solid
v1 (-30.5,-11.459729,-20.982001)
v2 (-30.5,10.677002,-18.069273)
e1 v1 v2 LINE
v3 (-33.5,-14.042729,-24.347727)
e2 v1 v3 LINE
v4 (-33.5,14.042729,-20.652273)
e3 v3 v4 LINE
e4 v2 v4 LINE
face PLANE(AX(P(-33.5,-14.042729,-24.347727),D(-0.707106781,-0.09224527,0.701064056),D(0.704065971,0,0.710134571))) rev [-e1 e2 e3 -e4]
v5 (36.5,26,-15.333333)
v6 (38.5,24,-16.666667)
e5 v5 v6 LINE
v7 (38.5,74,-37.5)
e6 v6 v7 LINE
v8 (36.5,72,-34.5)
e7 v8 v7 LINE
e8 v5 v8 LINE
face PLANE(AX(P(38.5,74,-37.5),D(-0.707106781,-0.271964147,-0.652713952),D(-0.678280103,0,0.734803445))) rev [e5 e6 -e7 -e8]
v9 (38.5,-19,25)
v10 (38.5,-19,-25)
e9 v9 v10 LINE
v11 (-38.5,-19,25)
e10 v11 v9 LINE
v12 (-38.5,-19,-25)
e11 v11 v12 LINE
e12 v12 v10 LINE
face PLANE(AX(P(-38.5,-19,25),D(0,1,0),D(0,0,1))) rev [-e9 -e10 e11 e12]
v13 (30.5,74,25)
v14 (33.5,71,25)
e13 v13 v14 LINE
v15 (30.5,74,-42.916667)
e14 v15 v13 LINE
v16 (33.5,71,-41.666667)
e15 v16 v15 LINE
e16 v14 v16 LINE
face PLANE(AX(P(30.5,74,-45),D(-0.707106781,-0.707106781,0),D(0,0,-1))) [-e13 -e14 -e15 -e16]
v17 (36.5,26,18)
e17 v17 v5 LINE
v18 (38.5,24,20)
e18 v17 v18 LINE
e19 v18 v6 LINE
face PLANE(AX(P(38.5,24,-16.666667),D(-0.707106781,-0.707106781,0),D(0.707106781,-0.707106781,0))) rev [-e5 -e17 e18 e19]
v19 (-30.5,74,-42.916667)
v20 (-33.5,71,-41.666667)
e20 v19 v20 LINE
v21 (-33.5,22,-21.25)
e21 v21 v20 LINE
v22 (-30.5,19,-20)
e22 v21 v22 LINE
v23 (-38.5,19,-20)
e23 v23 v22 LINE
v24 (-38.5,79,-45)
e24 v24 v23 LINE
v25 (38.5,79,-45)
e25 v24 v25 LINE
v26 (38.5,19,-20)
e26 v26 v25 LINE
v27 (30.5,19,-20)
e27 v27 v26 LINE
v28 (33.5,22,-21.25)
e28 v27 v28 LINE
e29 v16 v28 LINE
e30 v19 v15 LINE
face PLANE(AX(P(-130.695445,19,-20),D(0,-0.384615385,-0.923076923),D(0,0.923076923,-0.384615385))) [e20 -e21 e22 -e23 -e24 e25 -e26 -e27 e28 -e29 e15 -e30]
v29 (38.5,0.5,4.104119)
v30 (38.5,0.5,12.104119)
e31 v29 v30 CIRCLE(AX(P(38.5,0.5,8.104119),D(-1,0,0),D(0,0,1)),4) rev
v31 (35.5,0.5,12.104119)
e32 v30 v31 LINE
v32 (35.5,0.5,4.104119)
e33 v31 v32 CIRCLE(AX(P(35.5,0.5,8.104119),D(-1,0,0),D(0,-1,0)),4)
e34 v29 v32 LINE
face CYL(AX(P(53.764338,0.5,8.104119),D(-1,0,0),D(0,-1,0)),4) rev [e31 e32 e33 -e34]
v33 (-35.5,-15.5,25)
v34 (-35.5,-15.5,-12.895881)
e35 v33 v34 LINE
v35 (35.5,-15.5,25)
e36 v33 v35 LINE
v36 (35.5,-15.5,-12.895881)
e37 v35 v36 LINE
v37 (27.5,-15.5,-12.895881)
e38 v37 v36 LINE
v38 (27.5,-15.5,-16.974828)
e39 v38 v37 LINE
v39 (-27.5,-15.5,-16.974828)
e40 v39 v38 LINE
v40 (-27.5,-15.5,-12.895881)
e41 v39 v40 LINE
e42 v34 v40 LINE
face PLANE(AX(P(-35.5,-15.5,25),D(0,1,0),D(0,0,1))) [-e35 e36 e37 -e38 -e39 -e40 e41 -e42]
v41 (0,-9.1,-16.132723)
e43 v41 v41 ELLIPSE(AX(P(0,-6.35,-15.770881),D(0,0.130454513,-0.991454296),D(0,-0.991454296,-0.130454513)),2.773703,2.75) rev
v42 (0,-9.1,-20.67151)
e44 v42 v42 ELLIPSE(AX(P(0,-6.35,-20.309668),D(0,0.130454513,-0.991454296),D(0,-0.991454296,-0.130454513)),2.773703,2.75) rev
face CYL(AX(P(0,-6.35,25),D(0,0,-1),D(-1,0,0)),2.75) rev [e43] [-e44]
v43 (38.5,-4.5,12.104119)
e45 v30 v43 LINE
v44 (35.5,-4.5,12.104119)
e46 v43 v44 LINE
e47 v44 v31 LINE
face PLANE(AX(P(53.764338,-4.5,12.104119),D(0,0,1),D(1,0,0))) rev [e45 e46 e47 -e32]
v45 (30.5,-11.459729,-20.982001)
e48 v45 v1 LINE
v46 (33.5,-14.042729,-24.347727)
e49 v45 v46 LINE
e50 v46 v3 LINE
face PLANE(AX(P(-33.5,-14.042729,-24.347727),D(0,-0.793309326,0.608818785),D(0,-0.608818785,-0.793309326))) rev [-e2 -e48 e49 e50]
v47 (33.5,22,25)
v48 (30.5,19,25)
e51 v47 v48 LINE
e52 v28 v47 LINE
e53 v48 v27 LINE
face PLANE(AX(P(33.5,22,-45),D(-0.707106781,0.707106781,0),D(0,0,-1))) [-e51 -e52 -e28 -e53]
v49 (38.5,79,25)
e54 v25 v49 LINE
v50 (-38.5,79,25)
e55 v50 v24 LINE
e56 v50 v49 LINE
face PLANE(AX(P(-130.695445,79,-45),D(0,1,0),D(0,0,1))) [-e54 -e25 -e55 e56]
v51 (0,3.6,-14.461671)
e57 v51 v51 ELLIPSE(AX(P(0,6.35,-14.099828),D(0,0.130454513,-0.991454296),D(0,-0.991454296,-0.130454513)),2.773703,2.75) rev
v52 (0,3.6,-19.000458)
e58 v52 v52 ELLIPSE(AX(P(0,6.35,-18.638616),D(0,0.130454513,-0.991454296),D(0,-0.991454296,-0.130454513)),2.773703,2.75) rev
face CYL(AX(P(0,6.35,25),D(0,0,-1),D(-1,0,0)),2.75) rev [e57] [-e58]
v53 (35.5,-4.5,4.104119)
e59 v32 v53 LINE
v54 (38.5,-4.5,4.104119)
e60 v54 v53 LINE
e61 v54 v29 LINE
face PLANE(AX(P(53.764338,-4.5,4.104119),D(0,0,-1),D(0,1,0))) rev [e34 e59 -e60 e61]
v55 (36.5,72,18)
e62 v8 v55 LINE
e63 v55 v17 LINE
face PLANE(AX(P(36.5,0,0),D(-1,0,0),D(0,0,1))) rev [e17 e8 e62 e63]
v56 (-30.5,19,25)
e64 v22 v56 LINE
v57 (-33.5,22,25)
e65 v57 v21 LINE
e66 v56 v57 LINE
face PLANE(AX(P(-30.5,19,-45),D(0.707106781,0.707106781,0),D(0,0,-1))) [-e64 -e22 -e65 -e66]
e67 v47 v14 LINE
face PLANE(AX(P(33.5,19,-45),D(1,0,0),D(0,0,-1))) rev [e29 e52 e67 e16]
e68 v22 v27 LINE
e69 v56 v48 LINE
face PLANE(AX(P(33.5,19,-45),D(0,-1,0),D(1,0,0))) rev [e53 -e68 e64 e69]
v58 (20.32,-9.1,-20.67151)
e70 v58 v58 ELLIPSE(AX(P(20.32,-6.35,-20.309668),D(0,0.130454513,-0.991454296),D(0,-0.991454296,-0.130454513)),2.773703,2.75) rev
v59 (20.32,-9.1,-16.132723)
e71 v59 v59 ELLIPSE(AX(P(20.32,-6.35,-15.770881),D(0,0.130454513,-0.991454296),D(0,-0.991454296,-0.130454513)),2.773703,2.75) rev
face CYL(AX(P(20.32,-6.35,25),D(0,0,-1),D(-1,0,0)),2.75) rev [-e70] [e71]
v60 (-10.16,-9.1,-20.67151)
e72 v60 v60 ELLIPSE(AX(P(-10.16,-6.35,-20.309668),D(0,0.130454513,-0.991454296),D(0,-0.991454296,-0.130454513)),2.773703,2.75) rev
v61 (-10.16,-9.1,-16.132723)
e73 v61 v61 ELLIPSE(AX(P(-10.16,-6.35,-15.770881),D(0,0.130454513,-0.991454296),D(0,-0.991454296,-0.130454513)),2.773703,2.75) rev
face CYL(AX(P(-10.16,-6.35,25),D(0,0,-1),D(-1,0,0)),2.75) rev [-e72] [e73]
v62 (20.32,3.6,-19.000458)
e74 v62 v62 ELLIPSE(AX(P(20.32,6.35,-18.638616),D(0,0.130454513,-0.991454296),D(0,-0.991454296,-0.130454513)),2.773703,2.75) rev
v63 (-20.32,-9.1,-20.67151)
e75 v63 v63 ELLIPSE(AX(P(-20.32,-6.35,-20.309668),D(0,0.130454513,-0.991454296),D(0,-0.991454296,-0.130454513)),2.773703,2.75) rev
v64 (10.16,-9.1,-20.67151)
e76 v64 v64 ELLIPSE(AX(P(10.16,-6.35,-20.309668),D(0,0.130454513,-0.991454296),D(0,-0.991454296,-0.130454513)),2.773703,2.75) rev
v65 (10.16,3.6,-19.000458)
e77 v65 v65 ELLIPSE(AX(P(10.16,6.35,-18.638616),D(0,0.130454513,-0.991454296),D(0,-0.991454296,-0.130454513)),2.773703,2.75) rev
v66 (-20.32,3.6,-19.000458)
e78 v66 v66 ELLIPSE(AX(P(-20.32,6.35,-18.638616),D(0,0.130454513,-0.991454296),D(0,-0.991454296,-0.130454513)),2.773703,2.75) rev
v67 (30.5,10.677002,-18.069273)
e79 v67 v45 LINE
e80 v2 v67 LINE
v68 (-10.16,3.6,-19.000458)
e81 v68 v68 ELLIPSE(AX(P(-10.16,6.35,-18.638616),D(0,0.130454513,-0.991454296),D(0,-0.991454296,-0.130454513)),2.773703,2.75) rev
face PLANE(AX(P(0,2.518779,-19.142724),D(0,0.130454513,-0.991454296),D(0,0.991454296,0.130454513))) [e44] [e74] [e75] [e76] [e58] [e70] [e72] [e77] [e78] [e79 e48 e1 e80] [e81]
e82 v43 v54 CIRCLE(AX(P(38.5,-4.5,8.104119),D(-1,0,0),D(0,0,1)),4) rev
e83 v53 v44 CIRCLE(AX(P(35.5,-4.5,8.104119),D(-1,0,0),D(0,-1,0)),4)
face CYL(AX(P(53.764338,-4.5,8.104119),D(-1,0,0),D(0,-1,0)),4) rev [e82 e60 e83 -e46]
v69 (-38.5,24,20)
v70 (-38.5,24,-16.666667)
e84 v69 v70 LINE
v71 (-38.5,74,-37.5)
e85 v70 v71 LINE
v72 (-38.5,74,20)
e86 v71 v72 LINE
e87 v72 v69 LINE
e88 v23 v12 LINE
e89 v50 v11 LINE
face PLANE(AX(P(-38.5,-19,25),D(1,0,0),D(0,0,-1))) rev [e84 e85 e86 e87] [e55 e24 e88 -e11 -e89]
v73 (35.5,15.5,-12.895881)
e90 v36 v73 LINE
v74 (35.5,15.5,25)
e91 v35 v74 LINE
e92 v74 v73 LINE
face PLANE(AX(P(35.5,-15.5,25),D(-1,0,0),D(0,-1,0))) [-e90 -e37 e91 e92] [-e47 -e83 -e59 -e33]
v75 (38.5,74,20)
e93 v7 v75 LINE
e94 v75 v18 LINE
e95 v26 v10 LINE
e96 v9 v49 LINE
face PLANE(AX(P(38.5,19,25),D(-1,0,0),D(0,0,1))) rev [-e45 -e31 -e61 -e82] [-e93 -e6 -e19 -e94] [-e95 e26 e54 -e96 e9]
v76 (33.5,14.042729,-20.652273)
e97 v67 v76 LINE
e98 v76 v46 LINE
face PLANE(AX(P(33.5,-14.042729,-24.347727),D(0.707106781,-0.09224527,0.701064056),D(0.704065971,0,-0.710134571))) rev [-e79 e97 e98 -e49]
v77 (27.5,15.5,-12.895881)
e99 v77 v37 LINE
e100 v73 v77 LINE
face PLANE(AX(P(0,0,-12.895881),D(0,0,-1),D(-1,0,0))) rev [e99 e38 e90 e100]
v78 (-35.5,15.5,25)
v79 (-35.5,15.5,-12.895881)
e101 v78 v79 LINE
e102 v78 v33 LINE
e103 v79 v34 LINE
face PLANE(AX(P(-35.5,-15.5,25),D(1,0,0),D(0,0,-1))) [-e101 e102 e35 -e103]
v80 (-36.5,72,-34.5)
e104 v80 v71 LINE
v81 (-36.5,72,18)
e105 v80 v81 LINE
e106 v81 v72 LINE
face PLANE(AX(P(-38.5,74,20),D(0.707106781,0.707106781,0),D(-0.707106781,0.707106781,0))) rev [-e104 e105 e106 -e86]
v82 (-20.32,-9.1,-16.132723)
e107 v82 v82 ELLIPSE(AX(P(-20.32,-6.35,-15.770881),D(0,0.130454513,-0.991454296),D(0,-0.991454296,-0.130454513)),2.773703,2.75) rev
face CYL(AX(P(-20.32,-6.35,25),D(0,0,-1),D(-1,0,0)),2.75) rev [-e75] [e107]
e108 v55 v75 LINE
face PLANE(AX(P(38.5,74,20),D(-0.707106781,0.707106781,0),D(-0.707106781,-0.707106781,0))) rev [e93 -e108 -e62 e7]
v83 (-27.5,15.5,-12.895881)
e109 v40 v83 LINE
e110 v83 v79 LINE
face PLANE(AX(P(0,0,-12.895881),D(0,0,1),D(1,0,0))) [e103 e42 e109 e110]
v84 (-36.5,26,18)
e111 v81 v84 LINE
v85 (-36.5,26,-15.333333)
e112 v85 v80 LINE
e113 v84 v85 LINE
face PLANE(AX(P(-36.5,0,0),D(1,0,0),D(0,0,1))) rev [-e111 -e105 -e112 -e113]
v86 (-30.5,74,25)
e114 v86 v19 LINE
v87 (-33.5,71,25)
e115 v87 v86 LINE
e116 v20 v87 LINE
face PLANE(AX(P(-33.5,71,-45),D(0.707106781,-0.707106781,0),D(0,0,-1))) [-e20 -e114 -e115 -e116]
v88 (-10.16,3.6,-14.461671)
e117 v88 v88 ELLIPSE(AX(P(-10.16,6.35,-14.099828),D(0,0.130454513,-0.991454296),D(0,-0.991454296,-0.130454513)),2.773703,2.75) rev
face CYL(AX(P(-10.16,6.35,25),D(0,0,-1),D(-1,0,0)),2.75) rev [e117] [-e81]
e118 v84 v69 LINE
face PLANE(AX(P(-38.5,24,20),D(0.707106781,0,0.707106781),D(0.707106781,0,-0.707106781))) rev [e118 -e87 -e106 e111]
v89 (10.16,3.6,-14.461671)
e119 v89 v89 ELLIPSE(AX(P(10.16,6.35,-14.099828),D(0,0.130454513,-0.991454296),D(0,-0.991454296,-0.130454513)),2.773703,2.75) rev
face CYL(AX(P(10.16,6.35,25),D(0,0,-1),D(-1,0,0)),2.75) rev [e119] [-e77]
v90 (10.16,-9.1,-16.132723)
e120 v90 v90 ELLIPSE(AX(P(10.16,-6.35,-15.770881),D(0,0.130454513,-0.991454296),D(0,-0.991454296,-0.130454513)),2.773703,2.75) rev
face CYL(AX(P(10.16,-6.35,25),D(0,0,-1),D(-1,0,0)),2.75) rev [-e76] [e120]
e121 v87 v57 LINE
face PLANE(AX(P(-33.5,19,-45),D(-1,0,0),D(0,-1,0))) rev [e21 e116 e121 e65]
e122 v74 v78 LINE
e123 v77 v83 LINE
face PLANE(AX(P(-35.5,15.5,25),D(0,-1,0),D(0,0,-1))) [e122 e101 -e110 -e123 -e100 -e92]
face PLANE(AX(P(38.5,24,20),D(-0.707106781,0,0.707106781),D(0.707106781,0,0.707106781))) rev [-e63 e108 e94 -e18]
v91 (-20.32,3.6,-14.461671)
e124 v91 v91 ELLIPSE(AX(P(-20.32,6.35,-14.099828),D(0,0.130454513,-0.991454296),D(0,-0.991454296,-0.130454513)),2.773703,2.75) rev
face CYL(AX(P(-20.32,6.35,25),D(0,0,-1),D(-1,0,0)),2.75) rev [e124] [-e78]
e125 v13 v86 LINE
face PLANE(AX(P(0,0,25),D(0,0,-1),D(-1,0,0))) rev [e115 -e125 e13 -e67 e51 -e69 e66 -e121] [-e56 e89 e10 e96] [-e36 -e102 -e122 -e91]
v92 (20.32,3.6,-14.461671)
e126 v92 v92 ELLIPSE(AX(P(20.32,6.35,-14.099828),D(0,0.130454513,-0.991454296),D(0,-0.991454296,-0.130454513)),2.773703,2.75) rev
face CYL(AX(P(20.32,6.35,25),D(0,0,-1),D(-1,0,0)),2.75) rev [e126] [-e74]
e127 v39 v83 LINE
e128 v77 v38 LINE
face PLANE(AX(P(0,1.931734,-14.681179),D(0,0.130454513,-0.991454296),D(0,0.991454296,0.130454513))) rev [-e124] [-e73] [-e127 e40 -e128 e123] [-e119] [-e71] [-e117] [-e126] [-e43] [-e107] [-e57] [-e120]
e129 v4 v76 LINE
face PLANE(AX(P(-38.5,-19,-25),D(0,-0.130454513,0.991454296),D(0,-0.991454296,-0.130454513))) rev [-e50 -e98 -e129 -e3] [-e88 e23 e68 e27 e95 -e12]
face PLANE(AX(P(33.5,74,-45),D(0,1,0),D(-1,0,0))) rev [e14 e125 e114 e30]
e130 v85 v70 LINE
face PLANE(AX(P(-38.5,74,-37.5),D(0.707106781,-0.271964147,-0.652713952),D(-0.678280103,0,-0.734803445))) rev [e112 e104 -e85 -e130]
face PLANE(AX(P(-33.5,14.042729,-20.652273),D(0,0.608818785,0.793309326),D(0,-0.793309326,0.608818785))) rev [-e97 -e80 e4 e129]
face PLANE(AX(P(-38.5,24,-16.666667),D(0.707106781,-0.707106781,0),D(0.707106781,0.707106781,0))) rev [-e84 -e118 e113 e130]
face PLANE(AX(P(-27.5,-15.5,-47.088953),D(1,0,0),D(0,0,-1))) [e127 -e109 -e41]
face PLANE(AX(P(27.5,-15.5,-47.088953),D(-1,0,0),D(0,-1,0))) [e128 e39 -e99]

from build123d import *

# Parameters (mm, degrees)
SKIZZE1_W                                   = 77
SKIZZE1_H                                   = 38
AUFSATZ_LINEAR_AUSTRAGEN1_DEPTH             = 25
SKIZZE5_R                                   = 2.75
SCHNITT_LINEAR_AUSTRAGEN1_DEPTH             = 66.903338307
SCHNITT_LINEAR_AUSTRAGEN2_DEPTH             = 50.681485485
SCHNITT_LINEAR_AUSTRAGEN2_DEPTH_BACK        = 50.681485485
SKIZZE8_W                                   = 67
SKIZZE8_H                                   = 28.327535794
SCHNITT_LINEAR_AUSTRAGEN8_DEPTH             = 3
SCHNITT_LINEAR_AUSTRAGEN8_DRAFT             = -45
SKIZZE9_W                                   = 71
SKIZZE9_H                                   = 31
SCHNITT_LINEAR_AUSTRAGEN9_DEPTH             = 50.681485485
SCHNITT_LINEAR_AUSTRAGEN9_DIRECTION_2_REACH = 51.681
AUFSATZ_LINEAR_START                        = -16.974828462
AUFSATZ_LINEAR_AUSTRAGEN2_OUTLINE_W         = 8
AUFSATZ_LINEAR_AUSTRAGEN2_OUTLINE_H         = 31
AUFSATZ_LINEAR_AUSTRAGEN2_DEPTH             = 4.078947369
AUFSATZ_LINEAR_AUSTRAGEN4_DEPTH             = 77
SKIZZE23_W                                  = 67
SKIZZE23_H                                  = 55
SCHNITT_LINEAR_AUSTRAGEN19_DEPTH            = 113.353237604
SCHNITT_LINEAR_AUSTRAGEN20_DEPTH            = 2
SCHNITT_LINEAR_AUSTRAGEN20_DRAFT            = -45
SPIEGELN9_COPY_1_DEPTH                      = 2
SPIEGELN9_COPY_1_DRAFT                      = -45
FASE2_SIZE                                  = 3
SCHNITT_LINEAR_AUSTRAGEN21_DEPTH            = 3


# Read off the part's stored shape, not the designer's step: Aufsatz-Linear austragen2
with BuildPart() as part:
    # Skizze1 → Aufsatz-Linear austragen1 (new, symmetric)
    with BuildSketch(Plane.XY):
        Rectangle(SKIZZE1_W, SKIZZE1_H)
    extrude(amount=AUFSATZ_LINEAR_AUSTRAGEN1_DEPTH, both=True)

    # Skizze5 → Schnitt-Linear austragen1 (cut, through all)
    with BuildSketch(Plane(origin=(0, 0, -25), x_dir=(-1, 0, 0), z_dir=(0, 0, -1))):
        with Locations((-20.32, 6.35)):
            Circle(SKIZZE5_R)
        with Locations((-20.32, -6.35)):
            Circle(SKIZZE5_R)
        with Locations((-10.16, 6.35)):
            Circle(SKIZZE5_R)
        with Locations((-10.16, -6.35)):
            Circle(SKIZZE5_R)
        with Locations((0, 6.35)):
            Circle(SKIZZE5_R)
        with Locations((0, -6.35)):
            Circle(SKIZZE5_R)
        with Locations((10.16, 6.35)):
            Circle(SKIZZE5_R)
        with Locations((10.16, -6.35)):
            Circle(SKIZZE5_R)
        with Locations((20.32, 6.35)):
            Circle(SKIZZE5_R)
        with Locations((20.32, -6.35)):
            Circle(SKIZZE5_R)
    extrude(amount=-SCHNITT_LINEAR_AUSTRAGEN1_DEPTH, mode=Mode.SUBTRACT)

    # Skizze6 → Schnitt-Linear austragen2 (cut, two sides: drawn at the far end of the back side and taken through both)
    with BuildSketch(Plane(origin=(0, 0, 0), x_dir=(0, 0, -1), z_dir=(1, 0, 0)).offset(-SCHNITT_LINEAR_AUSTRAGEN2_DEPTH_BACK)):
        Polygon((20, 19), (25, 19), (25, -19), align=None)
    extrude(amount=SCHNITT_LINEAR_AUSTRAGEN2_DEPTH + SCHNITT_LINEAR_AUSTRAGEN2_DEPTH_BACK, mode=Mode.SUBTRACT)


with BuildPart() as schnitt_linear_austragen8_tool:
    # Skizze8 → Schnitt-Linear austragen8 (with draft: the straight prism first)
    with BuildSketch(Plane(origin=(0, 2.910142954, -22.117086453), x_dir=(1, 0, 0), z_dir=(0, 0.1304545125713874, -0.9914542955425438))):
        with Locations((0, 2.935226533)):
            Rectangle(SKIZZE8_W, SKIZZE8_H)
    extrude(amount=-SCHNITT_LINEAR_AUSTRAGEN8_DEPTH)
    # Schnitt-Linear austragen8: the draft: its side faces are tilted about the plane it starts from
    schnitt_linear_austragen8_sides = [schnitt_linear_austragen8_tool.faces().sort_by_distance(p)[0] for p in [
        (-33.5, -0.195681769, -21.012818557),
        (0, 13.847046753, -19.16509112),
        (33.5, -0.195681769, -21.012818557),
        (0, -14.238410291, -22.860545994),
    ]]
    draft(schnitt_linear_austragen8_sides, Plane(origin=(0, 2.910142954, -22.117086453), x_dir=(1, 0, 0), z_dir=(0, 0.1304545125713874, -0.9914542955425438)), SCHNITT_LINEAR_AUSTRAGEN8_DRAFT)


with BuildPart() as part_1:
    add(part.part)

    # Schnitt-Linear austragen8: cut by schnitt_linear_austragen8_tool
    add(schnitt_linear_austragen8_tool.part, mode=Mode.SUBTRACT)

    # Skizze9 → Schnitt-Linear austragen9 (cut)
    with BuildSketch(Plane.XY):
        Rectangle(SKIZZE9_W, SKIZZE9_H)
    extrude(amount=SCHNITT_LINEAR_AUSTRAGEN9_DEPTH, mode=Mode.SUBTRACT)

    # Schnitt-Linear austragen9 direction 2: up to this plane
    schnitt_linear_austragen9_direction_2_end = Plane(origin=(0, 1.93173411, -14.681179237), z_dir=(0, 0.13045451257138746, -0.9914542955425438))
    # Skizze9 → Schnitt-Linear austragen9 direction 2 (cut, up to the surface)
    with BuildSketch(Plane.XY, mode=Mode.PRIVATE) as schnitt_linear_austragen9_direction_2_sk1:
        Rectangle(SKIZZE9_W, SKIZZE9_H)
    schnitt_linear_austragen9_direction_2_tool1 = split(extrude(schnitt_linear_austragen9_direction_2_sk1.sketch, amount=-SCHNITT_LINEAR_AUSTRAGEN9_DIRECTION_2_REACH, mode=Mode.PRIVATE), bisect_by=schnitt_linear_austragen9_direction_2_end, keep=Keep.BOTH, mode=Mode.PRIVATE)
    add(schnitt_linear_austragen9_direction_2_tool1.solids().sort_by_distance((0, 0, 0))[0], mode=Mode.SUBTRACT)

    # Aufsatz-Linear austragen2 outline → Aufsatz-Linear austragen2 (add)
    with BuildSketch(Plane.XY.offset(AUFSATZ_LINEAR_START)):
        with Locations((-31.5, 0)):
            Rectangle(AUFSATZ_LINEAR_AUSTRAGEN2_OUTLINE_W, AUFSATZ_LINEAR_AUSTRAGEN2_OUTLINE_H)
        with Locations((31.5, 0)):
            Rectangle(AUFSATZ_LINEAR_AUSTRAGEN2_OUTLINE_W, AUFSATZ_LINEAR_AUSTRAGEN2_OUTLINE_H)
    extrude(amount=AUFSATZ_LINEAR_AUSTRAGEN2_DEPTH)

    # Skizze22 → Aufsatz-Linear austragen4 (add)
    with BuildSketch(Plane(origin=(38.5, 0, 0), x_dir=(0, 0, -1), z_dir=(1, 0, 0))):
        Polygon((20, 19), (45, 79), (-25, 79), (-25, 19), align=None)
    extrude(amount=-AUFSATZ_LINEAR_AUSTRAGEN4_DEPTH)

    # Skizze23 → Schnitt-Linear austragen19 (cut, through all)
    with BuildSketch(Plane.XY.offset(25)):
        with Locations((0, 46.5)):
            Rectangle(SKIZZE23_W, SKIZZE23_H)
    extrude(amount=-SCHNITT_LINEAR_AUSTRAGEN19_DEPTH, mode=Mode.SUBTRACT)


with BuildPart() as schnitt_linear_austragen20_tool:
    # Skizze24 → Schnitt-Linear austragen20 (with draft: the straight prism first)
    with BuildSketch(Plane(origin=(38.5, 0, 0), x_dir=(0, 0, -1), z_dir=(1, 0, 0))):
        Polygon((16.666666667, 24), (37.5, 74), (-20, 74), (-20, 24), align=None)
    extrude(amount=-SCHNITT_LINEAR_AUSTRAGEN20_DEPTH)
    # Schnitt-Linear austragen20: the draft: its side faces are tilted about the plane it starts from
    schnitt_linear_austragen20_sides = [schnitt_linear_austragen20_tool.faces().sort_by_distance(p)[0] for p in [
        (37.5, 49, -27.083333333),
        (37.5, 74, -8.75),
        (37.5, 49, 20),
        (37.5, 24, 1.666666667),
    ]]
    draft(schnitt_linear_austragen20_sides, Plane(origin=(38.5, 0, 0), x_dir=(0, 0, -1), z_dir=(1, 0, 0)), SCHNITT_LINEAR_AUSTRAGEN20_DRAFT)


with BuildPart() as part_2:
    add(part_1.part)

    # Schnitt-Linear austragen20: cut by schnitt_linear_austragen20_tool
    add(schnitt_linear_austragen20_tool.part, mode=Mode.SUBTRACT)


with BuildPart() as spiegeln9_copy_1_tool:
    # Spiegeln9 copy 1 sketch → Spiegeln9 copy 1 (with draft: the straight prism first)
    with BuildSketch(Plane(origin=(-38.5, 0, 0), x_dir=(0, 0, -1), z_dir=(-1, 0, 0))):
        Polygon((16.666666667, -24), (37.5, -74), (-20, -74), (-20, -24), align=None)
    extrude(amount=-SPIEGELN9_COPY_1_DEPTH)
    # Spiegeln9 copy 1: the draft: its side faces are tilted about the plane it starts from
    spiegeln9_copy_1_sides = [spiegeln9_copy_1_tool.faces().sort_by_distance(p)[0] for p in [
        (-37.5, 49, -27.083333333),
        (-37.5, 74, -8.75),
        (-37.5, 49, 20),
        (-37.5, 24, 1.666666667),
    ]]
    draft(spiegeln9_copy_1_sides, Plane(origin=(-38.5, 0, 0), x_dir=(0, 0, -1), z_dir=(-1, 0, 0)), SPIEGELN9_COPY_1_DRAFT)


with BuildPart() as part_3:
    add(part_2.part)

    # Spiegeln9 copy 1: cut by spiegeln9_copy_1_tool
    add(spiegeln9_copy_1_tool.part, mode=Mode.SUBTRACT)

    # Fase2
    fase2_edges = [part_3.edges().sort_by_distance(p)[0] for p in [
        (33.5, 74, -8.958333333),
        (33.5, 19, 2.5),
        (-33.5, 19, 2.5),
        (-33.5, 74, -8.958333333),
    ]]
    chamfer(fase2_edges, length=FASE2_SIZE)

    # Skizze25 → Schnitt-Linear austragen21 (cut)
    with BuildSketch(Plane.ZY.offset(-35.5)):
        with BuildLine():
            Line((4.104118907, -4.5), (4.104118907, 0.5))
            ThreePointArc((4.104118907, 0.5), (8.104118907, 4.5), (12.104118907, 0.5))
            Line((12.104118907, 0.5), (12.104118907, -4.5))
            ThreePointArc((12.104118907, -4.5), (8.104118907, -8.5), (4.104118907, -4.5))
        make_face()
    extrude(amount=-SCHNITT_LINEAR_AUSTRAGEN21_DEPTH, mode=Mode.SUBTRACT)


solid = part_3.part
